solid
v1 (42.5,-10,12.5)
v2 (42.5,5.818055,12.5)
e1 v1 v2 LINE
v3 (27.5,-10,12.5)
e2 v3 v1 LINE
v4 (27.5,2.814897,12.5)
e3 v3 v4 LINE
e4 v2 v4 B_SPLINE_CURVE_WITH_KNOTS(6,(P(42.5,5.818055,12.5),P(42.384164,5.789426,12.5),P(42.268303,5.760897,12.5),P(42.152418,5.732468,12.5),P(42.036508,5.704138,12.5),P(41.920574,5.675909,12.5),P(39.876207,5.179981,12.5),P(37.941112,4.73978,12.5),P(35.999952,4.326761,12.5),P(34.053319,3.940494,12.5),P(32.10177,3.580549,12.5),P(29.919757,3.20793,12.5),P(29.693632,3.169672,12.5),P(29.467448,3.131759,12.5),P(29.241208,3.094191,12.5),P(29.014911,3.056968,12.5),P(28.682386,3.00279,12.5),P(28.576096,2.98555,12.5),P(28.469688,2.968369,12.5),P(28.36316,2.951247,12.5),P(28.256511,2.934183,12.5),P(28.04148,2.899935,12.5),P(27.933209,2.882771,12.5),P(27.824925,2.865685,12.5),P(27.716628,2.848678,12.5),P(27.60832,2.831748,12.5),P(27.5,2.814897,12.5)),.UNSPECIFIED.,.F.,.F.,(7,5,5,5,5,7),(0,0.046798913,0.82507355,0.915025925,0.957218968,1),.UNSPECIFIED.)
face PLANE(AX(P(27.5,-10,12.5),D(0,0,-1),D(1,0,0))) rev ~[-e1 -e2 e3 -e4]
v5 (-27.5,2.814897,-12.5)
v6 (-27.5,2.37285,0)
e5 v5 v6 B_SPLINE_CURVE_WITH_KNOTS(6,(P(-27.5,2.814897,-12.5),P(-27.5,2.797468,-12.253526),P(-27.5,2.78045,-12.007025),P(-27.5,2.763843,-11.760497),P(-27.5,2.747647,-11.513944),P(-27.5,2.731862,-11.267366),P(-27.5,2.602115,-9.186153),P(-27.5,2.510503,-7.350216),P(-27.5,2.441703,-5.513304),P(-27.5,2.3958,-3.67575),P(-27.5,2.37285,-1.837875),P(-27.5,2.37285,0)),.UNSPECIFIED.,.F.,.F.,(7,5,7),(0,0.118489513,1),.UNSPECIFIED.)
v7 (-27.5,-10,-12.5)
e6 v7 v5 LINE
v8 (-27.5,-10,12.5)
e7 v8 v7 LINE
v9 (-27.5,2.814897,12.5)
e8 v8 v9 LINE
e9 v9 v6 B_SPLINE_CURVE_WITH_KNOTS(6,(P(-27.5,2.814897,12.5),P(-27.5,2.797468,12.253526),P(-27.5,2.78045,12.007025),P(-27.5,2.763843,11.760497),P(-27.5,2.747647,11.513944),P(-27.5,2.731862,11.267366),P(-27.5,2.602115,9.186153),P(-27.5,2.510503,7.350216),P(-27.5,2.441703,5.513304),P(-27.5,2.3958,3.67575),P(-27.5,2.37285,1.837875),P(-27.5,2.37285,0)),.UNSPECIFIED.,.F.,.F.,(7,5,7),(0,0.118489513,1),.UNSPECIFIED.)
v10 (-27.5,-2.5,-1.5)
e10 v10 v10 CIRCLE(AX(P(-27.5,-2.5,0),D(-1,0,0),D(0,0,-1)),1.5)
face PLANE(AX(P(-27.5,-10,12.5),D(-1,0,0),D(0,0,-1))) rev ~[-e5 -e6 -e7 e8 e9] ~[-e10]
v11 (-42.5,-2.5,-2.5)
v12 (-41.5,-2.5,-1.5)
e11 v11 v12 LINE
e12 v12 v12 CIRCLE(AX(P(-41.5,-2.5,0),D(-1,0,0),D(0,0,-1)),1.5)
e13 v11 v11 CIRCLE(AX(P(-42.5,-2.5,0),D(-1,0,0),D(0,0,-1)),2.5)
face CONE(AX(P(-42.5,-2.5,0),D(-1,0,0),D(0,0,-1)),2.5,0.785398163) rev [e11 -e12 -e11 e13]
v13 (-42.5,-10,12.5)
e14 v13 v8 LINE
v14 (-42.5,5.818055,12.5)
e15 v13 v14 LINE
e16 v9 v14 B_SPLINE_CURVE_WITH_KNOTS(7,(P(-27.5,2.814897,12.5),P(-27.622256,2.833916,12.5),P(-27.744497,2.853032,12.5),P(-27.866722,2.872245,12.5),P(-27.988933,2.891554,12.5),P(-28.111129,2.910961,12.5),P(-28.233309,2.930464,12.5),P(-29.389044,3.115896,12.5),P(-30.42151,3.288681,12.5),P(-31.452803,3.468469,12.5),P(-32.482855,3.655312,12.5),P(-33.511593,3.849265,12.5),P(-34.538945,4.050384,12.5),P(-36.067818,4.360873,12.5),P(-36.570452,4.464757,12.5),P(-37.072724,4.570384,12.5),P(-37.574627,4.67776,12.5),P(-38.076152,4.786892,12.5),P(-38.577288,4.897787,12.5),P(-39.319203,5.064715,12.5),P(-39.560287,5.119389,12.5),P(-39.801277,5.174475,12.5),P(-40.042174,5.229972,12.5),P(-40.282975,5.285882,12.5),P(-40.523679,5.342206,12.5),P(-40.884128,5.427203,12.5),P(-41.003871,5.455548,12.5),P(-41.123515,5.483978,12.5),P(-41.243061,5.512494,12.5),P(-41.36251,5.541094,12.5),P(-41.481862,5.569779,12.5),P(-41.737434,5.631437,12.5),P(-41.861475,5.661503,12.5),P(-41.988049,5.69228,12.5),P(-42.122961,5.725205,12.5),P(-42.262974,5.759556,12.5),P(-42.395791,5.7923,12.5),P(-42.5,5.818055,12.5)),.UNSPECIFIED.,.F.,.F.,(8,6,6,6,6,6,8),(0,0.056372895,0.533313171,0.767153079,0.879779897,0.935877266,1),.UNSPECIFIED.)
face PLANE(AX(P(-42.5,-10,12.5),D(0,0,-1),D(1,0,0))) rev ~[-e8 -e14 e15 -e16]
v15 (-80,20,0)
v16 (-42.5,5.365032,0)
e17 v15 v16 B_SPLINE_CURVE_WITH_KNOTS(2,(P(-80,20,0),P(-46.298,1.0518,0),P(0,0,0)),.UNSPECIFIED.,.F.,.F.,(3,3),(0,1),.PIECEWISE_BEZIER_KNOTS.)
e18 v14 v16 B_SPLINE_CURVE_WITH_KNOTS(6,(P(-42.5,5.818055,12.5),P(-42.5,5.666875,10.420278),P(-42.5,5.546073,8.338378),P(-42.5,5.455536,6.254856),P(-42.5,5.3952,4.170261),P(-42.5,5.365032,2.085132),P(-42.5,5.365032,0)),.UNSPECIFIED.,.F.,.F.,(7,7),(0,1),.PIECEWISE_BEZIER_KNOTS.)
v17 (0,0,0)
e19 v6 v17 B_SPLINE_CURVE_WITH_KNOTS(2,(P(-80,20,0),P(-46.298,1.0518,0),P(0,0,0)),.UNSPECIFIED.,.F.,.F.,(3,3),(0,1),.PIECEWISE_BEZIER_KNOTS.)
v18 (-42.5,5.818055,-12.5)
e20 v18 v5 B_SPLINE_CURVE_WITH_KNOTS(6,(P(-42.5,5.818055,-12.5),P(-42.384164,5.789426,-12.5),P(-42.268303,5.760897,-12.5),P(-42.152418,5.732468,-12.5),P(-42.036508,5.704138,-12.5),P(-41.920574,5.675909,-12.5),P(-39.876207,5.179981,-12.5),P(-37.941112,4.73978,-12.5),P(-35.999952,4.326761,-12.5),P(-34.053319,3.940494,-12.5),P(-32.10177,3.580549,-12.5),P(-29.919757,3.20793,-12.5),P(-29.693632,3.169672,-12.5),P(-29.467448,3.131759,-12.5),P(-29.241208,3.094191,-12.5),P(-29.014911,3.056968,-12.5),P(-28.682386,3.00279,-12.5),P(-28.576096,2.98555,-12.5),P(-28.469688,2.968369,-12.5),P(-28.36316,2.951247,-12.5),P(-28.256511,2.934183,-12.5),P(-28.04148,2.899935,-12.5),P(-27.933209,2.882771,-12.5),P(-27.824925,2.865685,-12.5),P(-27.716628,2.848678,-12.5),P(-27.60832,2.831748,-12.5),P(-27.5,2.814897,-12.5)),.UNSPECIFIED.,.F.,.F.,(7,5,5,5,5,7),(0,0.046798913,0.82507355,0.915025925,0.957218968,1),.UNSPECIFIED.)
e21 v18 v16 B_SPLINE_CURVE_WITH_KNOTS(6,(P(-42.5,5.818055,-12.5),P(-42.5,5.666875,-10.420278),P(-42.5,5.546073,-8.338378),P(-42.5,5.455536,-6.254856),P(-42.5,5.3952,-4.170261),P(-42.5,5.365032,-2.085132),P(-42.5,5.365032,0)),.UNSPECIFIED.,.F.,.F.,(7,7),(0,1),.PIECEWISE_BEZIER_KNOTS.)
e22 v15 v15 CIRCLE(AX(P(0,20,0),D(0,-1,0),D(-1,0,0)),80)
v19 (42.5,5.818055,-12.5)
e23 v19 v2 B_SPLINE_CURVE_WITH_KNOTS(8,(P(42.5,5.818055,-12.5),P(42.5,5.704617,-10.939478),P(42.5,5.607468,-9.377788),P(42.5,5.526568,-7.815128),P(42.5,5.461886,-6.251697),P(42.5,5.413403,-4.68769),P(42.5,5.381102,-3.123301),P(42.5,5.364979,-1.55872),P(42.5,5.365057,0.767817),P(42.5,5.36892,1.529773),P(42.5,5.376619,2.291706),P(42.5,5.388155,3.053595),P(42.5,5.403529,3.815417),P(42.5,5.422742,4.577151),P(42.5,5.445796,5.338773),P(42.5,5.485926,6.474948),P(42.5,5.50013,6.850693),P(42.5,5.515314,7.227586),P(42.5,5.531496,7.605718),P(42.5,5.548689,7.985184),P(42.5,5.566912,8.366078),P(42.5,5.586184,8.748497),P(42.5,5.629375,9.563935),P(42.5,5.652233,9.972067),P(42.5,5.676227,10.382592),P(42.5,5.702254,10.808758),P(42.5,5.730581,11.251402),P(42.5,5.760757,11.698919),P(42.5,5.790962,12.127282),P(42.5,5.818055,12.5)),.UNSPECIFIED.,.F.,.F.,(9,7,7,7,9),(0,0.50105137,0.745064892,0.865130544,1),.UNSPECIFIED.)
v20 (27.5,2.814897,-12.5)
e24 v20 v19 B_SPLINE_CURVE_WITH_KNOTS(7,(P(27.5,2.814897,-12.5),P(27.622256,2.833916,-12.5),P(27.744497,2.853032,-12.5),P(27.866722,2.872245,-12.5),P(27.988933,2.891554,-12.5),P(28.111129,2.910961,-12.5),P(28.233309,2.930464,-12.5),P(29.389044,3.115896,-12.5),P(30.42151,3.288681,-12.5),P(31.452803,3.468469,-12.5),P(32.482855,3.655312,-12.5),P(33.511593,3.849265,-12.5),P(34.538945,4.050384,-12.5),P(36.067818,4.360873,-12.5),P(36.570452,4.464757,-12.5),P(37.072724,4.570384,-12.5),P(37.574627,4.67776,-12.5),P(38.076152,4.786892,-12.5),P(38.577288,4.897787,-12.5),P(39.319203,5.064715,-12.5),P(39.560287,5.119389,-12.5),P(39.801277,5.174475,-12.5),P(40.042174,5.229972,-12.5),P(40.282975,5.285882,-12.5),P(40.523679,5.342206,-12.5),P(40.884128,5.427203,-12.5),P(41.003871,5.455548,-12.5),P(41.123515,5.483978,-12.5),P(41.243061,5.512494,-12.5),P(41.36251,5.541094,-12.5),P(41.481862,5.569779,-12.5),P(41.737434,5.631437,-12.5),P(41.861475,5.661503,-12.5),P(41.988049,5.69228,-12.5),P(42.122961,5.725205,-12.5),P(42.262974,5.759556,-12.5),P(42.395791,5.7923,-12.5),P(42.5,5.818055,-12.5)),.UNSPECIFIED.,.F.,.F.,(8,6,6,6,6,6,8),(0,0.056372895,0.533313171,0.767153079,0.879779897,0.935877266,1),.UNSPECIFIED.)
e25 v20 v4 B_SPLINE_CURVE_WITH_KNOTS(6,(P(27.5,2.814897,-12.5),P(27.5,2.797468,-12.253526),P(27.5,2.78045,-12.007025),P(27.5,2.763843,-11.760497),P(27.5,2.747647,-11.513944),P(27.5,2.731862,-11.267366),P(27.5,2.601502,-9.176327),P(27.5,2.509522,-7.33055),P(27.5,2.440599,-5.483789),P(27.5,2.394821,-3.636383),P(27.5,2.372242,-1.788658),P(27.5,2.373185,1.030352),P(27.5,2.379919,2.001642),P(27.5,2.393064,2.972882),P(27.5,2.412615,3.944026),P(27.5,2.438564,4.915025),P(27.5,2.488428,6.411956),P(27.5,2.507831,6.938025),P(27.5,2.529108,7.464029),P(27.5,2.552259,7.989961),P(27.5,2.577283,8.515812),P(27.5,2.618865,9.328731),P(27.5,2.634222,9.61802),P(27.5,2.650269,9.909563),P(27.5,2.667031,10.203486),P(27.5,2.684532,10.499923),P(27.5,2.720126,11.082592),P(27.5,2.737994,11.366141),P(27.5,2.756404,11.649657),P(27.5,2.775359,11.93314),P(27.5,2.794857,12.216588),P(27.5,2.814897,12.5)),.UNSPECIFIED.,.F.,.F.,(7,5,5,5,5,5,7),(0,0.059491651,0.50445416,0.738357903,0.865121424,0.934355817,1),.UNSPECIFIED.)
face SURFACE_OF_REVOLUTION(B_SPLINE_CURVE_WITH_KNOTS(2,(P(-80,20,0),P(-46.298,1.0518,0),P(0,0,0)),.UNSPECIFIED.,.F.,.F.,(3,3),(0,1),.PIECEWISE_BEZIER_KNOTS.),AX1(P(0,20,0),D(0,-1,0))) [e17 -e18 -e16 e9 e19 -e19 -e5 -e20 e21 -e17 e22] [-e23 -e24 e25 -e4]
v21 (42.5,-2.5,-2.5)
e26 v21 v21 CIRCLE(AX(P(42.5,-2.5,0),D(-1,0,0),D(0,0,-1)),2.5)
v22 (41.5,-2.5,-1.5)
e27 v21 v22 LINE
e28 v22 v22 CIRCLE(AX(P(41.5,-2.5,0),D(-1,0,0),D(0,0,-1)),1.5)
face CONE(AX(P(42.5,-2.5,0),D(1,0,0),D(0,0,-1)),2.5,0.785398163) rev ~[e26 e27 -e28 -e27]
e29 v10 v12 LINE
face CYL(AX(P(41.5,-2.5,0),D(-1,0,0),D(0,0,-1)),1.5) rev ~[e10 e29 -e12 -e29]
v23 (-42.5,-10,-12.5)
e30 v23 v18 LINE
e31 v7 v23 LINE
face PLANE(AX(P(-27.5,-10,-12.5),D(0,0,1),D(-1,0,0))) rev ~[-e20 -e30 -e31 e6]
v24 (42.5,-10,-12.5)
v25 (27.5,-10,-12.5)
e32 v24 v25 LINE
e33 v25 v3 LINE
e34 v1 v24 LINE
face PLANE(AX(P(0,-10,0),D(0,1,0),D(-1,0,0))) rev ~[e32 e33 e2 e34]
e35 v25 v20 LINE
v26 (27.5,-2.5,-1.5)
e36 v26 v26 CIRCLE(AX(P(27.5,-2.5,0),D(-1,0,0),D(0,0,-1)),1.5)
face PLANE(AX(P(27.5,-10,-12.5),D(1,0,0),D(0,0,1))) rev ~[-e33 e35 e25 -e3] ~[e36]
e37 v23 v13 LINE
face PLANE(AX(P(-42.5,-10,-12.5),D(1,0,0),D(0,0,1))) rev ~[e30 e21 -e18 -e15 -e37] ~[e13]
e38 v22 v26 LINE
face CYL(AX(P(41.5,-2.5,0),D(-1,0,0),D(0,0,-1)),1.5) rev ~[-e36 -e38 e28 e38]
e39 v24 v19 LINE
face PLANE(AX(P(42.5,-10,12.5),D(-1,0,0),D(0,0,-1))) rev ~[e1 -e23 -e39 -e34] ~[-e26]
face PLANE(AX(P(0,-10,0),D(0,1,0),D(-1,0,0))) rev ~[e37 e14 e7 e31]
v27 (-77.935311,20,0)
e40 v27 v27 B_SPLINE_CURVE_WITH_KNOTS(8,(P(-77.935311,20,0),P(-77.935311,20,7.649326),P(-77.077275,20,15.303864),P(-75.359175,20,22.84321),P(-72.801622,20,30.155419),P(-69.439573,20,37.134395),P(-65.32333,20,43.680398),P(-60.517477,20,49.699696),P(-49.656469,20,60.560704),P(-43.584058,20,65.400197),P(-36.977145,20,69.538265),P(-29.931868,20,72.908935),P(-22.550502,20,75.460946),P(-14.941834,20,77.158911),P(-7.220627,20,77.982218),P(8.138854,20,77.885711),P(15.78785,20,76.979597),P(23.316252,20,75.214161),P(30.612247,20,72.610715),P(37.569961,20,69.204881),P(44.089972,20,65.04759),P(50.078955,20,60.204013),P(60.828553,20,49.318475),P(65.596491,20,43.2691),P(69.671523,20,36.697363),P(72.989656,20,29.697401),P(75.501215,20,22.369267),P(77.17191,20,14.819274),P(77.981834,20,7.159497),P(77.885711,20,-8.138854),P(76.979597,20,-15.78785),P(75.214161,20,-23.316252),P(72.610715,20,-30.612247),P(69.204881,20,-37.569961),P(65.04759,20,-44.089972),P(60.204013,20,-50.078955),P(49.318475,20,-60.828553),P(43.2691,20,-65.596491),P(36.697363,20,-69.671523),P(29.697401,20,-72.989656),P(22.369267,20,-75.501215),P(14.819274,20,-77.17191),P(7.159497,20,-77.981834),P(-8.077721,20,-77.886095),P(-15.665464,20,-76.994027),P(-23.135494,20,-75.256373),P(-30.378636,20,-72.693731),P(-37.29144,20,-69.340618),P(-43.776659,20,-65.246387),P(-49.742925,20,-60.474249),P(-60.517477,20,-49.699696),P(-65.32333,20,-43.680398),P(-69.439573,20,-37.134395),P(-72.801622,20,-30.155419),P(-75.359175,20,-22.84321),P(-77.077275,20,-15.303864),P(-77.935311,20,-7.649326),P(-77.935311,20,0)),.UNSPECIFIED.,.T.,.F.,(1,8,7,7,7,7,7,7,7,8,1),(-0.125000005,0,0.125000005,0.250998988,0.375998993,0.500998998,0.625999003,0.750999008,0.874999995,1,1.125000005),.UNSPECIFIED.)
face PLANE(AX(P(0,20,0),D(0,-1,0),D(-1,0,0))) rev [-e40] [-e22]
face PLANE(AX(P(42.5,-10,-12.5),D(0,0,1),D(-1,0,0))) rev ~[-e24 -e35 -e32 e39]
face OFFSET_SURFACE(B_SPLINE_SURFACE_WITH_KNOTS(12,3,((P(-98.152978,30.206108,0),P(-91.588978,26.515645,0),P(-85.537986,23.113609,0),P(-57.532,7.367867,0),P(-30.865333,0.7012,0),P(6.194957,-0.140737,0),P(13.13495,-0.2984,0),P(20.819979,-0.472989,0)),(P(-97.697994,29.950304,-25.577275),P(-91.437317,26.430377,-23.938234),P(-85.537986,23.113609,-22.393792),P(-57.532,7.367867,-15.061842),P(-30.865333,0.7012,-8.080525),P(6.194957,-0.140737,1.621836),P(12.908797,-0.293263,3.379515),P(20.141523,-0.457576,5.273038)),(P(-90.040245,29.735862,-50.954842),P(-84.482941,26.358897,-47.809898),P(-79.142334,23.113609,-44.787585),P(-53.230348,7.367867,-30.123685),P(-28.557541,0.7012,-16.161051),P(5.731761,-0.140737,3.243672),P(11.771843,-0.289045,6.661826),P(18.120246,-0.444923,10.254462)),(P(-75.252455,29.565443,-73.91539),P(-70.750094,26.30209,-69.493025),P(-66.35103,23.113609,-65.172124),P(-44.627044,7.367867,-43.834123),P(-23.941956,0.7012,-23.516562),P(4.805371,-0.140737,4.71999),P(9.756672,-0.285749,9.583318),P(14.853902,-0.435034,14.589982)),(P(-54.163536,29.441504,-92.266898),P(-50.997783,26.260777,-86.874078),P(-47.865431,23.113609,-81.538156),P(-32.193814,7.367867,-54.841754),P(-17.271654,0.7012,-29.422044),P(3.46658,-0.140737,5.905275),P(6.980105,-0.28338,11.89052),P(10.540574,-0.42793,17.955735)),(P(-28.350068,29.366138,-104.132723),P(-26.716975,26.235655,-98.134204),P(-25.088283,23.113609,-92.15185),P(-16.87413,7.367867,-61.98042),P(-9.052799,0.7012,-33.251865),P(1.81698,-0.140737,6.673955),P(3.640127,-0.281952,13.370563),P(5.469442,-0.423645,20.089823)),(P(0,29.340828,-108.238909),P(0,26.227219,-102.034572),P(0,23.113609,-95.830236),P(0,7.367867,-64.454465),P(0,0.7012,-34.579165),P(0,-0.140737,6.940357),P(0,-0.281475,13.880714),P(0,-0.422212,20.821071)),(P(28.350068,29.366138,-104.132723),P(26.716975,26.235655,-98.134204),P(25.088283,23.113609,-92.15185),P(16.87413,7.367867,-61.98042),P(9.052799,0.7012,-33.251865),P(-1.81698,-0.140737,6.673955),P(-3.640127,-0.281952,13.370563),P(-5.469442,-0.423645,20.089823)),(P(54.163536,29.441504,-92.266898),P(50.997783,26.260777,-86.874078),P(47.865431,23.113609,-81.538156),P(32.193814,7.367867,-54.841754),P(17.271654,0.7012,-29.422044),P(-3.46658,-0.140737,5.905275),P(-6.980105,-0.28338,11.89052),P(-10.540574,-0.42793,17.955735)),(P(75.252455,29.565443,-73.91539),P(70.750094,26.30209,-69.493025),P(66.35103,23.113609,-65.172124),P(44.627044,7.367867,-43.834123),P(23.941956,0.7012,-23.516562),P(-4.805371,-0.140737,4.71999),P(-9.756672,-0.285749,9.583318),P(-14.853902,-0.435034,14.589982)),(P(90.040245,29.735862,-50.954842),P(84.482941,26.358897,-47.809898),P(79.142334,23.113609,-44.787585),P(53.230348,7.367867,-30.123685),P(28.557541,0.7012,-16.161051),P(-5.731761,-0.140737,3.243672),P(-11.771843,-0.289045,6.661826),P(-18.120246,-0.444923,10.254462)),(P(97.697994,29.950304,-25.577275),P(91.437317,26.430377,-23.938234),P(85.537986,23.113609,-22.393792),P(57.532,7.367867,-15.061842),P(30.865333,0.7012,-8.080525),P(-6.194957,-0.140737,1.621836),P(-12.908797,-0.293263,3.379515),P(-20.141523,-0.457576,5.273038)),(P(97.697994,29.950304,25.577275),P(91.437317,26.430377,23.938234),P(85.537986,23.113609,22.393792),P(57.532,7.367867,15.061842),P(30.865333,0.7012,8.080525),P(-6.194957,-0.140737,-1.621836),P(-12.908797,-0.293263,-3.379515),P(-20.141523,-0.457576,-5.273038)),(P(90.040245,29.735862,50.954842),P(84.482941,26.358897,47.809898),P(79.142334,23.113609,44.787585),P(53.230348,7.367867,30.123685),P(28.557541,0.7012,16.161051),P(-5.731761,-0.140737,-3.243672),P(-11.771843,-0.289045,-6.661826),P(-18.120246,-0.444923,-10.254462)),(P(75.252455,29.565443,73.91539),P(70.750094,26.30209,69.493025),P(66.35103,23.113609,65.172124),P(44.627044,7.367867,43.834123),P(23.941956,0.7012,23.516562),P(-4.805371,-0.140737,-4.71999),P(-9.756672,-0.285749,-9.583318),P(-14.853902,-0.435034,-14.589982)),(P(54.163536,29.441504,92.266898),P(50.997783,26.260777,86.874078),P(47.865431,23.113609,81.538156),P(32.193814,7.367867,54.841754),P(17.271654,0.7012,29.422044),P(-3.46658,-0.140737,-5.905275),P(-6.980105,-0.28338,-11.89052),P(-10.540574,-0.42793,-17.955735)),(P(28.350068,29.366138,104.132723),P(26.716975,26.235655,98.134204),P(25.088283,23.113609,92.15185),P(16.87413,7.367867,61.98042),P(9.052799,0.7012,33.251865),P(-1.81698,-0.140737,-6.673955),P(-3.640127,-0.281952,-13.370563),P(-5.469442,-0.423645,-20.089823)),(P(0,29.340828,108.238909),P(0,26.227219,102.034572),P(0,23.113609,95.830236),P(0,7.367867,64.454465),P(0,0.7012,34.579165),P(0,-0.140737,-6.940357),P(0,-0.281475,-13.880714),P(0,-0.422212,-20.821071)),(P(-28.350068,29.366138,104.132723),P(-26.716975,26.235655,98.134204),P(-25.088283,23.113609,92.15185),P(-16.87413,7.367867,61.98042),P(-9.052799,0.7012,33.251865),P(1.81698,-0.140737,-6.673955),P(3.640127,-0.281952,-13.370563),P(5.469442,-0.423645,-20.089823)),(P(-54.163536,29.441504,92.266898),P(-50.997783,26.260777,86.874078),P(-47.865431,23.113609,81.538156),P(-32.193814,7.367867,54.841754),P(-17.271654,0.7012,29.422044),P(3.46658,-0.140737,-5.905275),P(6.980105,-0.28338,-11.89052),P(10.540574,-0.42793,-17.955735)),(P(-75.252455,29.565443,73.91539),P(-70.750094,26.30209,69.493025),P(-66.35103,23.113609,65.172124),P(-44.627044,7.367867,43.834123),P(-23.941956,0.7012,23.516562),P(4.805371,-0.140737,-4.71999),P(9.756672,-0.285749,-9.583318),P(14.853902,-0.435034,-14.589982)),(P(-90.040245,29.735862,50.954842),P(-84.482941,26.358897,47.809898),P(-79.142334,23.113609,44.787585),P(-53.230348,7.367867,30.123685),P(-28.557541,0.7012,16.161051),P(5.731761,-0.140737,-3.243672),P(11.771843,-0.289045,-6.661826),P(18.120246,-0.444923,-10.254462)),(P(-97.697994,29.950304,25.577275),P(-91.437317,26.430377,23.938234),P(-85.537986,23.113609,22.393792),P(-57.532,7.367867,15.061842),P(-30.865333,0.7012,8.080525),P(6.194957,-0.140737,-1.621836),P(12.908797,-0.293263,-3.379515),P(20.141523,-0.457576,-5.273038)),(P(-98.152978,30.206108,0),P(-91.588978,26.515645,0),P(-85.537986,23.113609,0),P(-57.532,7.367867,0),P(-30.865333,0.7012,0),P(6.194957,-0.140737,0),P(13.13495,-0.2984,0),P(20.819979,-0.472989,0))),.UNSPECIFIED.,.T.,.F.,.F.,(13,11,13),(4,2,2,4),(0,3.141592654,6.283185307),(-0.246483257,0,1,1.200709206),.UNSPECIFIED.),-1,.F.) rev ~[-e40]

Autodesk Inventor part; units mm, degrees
ref_plane "YZ Plane" through (0, 0, 0) normal (1, 0, 0) x (0, 1, 0)
ref_plane "XY Plane" through (0, 0, 0) normal (0, 0, 1) x (1, 0, 0)
sketch "Boceto1" plane through (0, 0, 0) normal (0, 0, 1) x (1, 0, 0)
  line L0 (0, 50) -> (0, -50) construction
  line L1 (-50, 0) -> (50, 0) construction
  line L2 (-93.996, 20) -> (36.7723, 20) construction
  line L3 (-80, 55.4649) -> (-80, -15.4649) construction
  spline S0 degree 2 poles (-80, 20) (-46.298, 1.0518) (0, 0) knots 0 0 0 1 1 1
  line L4 (0, 20) -> (-80, 20)
  line L5 (0, 20) -> (0, 0)
  point P0 (-45, 6)
  dimension "d0" = 100
  dimension "d1" = 100
  dimension "d2" = 20
  dimension "d3" = 80
  dimension "d4" = 14
  dimension "d5" = 45
  dimension "d6" = 36.7723
  dimension "d7" = 55.4649
  dimension "d8" = 93.996
revolve "Revolución1" add sketch "Boceto1" angle 360 about axis through (0, 20, 0) along (0, -1, 0)
shell "Vaciado1" thickness 1 removed faces 1 at (-23.7602, 20, 12.1064)
ref_plane "Plano de trabajo1" through (0, -10, 0) normal (0, 1, 0) x (-1, 0, 0)
sketch "Boceto2" plane through (0, -10, 0) normal (0, 1, 0) x (-1, 0, 0)
  line L0 (-42.5, -12.5) -> (-27.5, -12.5)
  line L1 (-27.5, -12.5) -> (-27.5, 12.5)
  line L2 (-27.5, 12.5) -> (-42.5, 12.5)
  line L3 (-42.5, 12.5) -> (-42.5, -12.5)
  line L4 (-42.5, -12.5) -> (-27.5, 12.5) construction
  line L5 (-27.5, -12.5) -> (-42.5, 12.5) construction
  line L6 (27.5, -12.5) -> (42.5, -12.5)
  line L7 (42.5, -12.5) -> (42.5, 12.5)
  line L8 (42.5, 12.5) -> (27.5, 12.5)
  line L9 (27.5, 12.5) -> (27.5, -12.5)
  line L10 (27.5, -12.5) -> (42.5, 12.5) construction
  line L11 (42.5, -12.5) -> (27.5, 12.5) construction
  circle A0 centre (0, 0) radius 80 construction
  line L12 (0, 80) -> (0, -80) construction
  line L13 (76.5933, 0) -> (-80, 0) construction
  point P0 (-35, 0)
  point P1 (35, 0)
  point P2 (80, 0)
  dimension "d12" = 35
  dimension "d13" = 35
  dimension "d14" = 15
  dimension "d15" = 25
  dimension "d16" = 15
  dimension "d17" = 25
  dimension "d18" = 76.5933
extrude "Extrusión1" add sketch "Boceto2" along normal up to next
sketch "Boceto3" plane through (42.5, -10, 12.5) normal (1, 0, 0) x (0, 0, -1)
  line L0 (12.5, 97.2101) -> (12.5, -82.1758) construction
  line L1 (-112.7287, 7.5172) -> (171.2472, 7.5172) construction
  line L2 (0, 0) -> (25, 0) construction
  line L3 (25, 0) -> (25, 15.8181) construction
  point P0 (12.5, 10)
  point P1 (12.5, 7.5)
  dimension "d21" = 7.5
  dimension "d22" = 12.5
hole "Agujero1" at (42.5, -2.5, 0) direction (-1, 0, 0) diameter 3 end through all countersink diameter 5 countersink angle 90
mirror "Simetría1" about plane through (0, 0, 0) normal (1, 0, 0) of "Agujero1"
properties part number "ensayo9"
